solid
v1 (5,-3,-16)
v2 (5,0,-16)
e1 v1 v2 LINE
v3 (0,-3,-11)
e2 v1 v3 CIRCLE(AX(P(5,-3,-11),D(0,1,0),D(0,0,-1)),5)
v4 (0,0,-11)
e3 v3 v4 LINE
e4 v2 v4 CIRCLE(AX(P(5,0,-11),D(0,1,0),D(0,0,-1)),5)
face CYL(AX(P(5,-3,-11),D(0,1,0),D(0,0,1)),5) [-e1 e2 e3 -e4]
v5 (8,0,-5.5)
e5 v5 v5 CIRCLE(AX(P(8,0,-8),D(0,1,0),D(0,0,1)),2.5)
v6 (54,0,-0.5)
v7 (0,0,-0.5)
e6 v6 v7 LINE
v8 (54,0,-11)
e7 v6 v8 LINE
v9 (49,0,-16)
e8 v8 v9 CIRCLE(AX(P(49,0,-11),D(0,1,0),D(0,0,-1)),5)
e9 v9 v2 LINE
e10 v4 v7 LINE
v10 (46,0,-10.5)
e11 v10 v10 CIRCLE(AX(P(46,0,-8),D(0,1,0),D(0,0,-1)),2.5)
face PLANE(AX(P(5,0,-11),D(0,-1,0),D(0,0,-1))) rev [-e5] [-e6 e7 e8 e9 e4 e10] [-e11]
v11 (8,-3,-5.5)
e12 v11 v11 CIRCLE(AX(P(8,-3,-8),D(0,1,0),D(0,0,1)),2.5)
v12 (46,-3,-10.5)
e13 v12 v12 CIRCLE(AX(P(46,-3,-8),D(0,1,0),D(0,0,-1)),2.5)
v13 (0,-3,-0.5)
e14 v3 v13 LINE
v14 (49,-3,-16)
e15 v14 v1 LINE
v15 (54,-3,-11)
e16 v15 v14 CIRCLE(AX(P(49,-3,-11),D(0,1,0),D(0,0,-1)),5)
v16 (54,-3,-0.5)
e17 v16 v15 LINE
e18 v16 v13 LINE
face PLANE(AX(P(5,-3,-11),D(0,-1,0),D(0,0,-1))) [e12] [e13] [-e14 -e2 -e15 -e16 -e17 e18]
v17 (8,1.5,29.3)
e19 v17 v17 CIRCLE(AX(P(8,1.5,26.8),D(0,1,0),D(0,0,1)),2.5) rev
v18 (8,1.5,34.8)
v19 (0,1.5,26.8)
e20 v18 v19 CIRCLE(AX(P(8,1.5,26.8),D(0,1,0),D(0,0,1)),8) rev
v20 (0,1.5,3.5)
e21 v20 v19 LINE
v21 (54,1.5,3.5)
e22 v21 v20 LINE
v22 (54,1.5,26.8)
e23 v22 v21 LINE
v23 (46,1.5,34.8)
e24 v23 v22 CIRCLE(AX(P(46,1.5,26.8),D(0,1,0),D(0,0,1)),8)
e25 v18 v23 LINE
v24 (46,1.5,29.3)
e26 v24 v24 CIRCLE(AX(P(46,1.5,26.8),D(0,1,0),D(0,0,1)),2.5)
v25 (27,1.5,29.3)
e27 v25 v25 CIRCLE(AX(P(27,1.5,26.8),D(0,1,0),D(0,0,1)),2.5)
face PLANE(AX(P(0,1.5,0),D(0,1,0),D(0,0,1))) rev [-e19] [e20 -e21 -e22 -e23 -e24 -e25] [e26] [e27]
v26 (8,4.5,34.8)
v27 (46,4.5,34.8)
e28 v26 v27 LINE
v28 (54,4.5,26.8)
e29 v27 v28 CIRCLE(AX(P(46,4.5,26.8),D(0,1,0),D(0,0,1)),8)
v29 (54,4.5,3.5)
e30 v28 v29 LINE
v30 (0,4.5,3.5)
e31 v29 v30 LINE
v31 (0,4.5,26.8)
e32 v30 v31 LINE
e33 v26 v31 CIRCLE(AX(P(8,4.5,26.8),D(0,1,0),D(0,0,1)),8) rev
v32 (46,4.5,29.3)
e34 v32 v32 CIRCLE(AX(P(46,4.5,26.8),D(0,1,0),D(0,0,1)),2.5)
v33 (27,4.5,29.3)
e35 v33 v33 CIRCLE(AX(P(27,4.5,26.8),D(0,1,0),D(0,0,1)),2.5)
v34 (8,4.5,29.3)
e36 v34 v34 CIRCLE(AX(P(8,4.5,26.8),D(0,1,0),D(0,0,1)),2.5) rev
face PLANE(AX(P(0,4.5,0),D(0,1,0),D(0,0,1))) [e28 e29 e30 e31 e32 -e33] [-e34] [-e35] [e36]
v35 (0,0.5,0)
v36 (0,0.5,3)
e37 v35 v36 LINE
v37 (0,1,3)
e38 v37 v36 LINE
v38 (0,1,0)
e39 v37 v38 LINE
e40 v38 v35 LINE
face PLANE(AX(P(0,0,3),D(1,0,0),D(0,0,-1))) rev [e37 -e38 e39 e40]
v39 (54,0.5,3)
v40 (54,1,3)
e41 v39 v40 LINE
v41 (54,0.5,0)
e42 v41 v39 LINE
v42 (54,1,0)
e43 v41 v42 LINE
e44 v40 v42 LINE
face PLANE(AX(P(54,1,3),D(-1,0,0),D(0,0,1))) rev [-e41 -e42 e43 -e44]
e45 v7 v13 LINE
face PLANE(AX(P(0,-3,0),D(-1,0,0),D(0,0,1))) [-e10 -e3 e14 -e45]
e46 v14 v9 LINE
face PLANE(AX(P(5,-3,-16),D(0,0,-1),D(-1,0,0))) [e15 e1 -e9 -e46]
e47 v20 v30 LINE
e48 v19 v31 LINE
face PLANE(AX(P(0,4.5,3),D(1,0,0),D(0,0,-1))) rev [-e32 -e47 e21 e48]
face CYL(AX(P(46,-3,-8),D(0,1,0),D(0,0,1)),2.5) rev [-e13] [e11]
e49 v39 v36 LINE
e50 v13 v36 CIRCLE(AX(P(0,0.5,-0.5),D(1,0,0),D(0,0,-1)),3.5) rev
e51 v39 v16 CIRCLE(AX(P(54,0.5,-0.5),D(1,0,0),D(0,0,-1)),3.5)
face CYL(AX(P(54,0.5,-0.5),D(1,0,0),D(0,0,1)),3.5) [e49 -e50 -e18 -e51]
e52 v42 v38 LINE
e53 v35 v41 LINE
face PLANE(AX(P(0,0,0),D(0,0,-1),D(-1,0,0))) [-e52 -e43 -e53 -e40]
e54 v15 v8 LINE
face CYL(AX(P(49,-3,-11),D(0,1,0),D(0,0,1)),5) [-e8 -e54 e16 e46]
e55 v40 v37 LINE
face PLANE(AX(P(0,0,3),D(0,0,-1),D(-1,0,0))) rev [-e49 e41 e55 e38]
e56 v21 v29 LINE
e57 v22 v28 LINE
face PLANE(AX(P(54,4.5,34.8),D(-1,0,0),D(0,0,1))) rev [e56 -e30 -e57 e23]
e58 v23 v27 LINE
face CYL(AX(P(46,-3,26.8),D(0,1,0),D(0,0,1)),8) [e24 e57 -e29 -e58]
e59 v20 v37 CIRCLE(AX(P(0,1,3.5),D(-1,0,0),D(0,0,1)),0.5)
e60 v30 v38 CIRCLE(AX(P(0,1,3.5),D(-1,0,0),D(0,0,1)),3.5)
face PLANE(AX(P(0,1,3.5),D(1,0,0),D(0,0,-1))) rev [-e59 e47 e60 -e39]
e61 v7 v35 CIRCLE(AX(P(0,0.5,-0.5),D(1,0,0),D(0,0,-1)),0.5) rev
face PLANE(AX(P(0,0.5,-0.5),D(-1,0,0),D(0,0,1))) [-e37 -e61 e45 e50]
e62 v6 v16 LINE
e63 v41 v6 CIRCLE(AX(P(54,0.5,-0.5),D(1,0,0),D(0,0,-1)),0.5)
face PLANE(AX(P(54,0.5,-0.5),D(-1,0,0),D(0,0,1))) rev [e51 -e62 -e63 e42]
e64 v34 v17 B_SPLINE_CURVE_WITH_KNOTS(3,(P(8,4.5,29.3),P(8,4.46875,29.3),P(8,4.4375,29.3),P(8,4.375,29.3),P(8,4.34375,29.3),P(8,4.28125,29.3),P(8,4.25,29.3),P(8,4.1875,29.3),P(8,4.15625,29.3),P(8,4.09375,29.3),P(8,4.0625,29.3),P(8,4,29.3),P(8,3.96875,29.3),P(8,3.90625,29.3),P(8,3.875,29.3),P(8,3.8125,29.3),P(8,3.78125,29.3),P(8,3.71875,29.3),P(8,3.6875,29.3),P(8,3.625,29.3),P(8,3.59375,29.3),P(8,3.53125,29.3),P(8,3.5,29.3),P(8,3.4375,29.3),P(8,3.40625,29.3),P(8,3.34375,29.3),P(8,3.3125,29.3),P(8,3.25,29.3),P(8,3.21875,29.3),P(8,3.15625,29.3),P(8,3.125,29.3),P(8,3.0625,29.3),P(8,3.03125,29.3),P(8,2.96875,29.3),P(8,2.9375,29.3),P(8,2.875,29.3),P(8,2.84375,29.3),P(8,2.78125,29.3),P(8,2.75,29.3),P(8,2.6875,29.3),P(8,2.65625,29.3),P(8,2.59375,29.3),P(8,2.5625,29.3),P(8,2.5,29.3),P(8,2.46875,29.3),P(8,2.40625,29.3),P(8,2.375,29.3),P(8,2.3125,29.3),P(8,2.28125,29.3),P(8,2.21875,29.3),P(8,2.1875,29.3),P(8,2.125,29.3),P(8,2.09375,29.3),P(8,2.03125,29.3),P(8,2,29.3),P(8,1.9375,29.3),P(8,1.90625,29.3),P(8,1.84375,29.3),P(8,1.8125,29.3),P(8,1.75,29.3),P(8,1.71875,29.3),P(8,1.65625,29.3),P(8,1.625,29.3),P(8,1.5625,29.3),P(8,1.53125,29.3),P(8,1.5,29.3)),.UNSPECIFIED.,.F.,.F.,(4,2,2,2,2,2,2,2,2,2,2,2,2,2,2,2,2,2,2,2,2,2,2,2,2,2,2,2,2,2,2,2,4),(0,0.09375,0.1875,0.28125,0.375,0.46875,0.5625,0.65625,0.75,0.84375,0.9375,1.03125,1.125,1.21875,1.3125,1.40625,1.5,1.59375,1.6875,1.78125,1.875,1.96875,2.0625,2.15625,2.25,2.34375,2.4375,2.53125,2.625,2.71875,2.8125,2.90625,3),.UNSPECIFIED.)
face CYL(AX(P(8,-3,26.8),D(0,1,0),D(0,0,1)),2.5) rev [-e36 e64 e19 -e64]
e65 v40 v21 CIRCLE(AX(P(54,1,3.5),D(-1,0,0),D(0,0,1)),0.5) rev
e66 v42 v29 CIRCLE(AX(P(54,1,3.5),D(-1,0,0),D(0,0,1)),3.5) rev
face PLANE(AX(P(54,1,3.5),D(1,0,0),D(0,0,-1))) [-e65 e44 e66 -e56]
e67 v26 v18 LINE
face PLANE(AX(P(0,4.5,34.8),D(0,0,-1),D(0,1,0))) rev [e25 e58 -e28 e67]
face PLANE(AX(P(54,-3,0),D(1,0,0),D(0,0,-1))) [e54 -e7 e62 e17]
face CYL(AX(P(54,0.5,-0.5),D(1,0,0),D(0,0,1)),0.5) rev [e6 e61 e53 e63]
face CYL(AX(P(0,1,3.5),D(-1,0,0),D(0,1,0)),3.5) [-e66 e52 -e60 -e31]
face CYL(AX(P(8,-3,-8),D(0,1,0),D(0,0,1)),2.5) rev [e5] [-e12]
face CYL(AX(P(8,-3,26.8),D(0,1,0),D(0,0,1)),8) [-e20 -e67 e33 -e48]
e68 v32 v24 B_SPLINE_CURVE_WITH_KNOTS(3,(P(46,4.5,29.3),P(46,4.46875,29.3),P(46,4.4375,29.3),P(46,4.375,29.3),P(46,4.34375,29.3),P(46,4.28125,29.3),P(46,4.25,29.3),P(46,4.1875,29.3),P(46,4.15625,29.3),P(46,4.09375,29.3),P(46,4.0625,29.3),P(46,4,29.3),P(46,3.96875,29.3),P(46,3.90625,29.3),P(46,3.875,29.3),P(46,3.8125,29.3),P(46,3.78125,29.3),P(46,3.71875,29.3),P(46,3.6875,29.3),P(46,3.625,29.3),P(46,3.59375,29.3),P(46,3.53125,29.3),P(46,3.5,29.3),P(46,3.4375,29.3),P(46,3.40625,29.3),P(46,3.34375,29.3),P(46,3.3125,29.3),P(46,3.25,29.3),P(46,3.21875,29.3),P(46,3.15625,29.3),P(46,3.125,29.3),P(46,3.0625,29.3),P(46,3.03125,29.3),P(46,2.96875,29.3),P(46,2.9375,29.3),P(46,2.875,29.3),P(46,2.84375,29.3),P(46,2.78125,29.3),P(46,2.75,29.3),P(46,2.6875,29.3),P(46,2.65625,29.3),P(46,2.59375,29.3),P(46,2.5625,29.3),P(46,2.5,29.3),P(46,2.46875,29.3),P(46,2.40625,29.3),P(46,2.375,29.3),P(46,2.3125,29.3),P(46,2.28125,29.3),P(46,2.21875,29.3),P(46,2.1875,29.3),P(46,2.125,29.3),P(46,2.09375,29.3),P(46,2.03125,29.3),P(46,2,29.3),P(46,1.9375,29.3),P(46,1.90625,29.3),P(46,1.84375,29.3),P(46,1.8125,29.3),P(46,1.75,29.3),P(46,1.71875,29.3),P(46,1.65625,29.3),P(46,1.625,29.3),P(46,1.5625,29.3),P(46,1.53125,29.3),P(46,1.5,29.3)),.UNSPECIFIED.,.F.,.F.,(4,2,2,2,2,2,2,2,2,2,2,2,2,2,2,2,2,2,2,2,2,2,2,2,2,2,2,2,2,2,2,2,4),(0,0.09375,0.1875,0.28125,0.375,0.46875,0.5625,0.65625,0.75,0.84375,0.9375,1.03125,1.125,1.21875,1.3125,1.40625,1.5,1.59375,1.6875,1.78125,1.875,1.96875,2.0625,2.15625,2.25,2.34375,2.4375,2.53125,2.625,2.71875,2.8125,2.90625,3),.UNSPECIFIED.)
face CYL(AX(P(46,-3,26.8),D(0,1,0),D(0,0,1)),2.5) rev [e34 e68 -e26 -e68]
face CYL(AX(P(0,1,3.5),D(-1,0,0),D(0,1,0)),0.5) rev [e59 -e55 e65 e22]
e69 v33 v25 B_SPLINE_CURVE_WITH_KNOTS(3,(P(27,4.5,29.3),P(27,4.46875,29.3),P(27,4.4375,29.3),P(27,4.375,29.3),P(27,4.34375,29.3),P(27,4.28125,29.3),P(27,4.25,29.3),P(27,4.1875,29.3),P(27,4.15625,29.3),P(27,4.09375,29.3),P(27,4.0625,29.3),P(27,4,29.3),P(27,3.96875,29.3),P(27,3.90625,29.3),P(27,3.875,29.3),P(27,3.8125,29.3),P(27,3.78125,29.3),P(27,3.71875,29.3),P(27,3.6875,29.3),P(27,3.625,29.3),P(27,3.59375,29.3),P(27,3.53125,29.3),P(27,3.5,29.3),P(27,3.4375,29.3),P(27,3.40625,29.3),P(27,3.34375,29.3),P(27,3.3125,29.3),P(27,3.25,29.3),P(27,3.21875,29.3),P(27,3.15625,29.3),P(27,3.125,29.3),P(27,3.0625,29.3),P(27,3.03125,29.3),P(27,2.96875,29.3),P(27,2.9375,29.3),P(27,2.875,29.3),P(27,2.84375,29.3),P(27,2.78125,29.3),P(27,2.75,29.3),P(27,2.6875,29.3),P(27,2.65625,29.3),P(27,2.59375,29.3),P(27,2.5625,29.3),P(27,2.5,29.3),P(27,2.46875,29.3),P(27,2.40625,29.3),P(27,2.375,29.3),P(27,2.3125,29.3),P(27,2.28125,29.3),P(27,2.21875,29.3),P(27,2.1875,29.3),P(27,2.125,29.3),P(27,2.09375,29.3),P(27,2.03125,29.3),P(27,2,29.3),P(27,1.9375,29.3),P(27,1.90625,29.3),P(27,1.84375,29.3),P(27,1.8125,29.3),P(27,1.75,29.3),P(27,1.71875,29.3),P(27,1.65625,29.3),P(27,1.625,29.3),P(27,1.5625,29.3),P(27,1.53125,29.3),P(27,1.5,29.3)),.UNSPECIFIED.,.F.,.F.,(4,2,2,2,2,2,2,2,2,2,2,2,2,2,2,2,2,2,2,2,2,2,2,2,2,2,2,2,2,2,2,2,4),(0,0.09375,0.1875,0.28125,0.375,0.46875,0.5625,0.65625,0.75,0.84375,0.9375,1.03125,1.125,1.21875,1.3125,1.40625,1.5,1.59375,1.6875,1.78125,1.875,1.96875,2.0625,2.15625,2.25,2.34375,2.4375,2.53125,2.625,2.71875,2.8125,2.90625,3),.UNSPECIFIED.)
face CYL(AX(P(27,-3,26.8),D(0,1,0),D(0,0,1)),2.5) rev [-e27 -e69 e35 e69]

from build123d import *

# Parameters (mm, degrees)
SKETCH1_R                    = 2.5
BASE_FLANGE1_DEPTH           = 3
EDGE_FLANGE1_STRIP_W         = 13
EDGE_FLANGE1_STRIP_H         = 3
EDGE_FLANGE1_STRIP_CUT_DEPTH = 54
EDGE_FLANGE1_DEPTH           = 54
EDGE_FLANGE2_DEPTH           = 54
SKETCH25_R                   = 2.5
CUT_EXTRUDE1_DEPTH           = 65.67835805


# Sheet-metal steps are written as plain solids
with BuildPart() as part:
    # Sketch1 → Base-Flange1 (new body)
    with BuildSketch(Plane(origin=(0, 0, 0), x_dir=(1, 0, 0), z_dir=(0, 1, 0))):
        with BuildLine():
            Line((0, 0), (54, 0))
            Line((54, 0), (54, 11))
            ThreePointArc((54, 11), (52.535533906, 14.535533906), (49, 16))
            Line((49, 16), (5, 16))
            ThreePointArc((5, 16), (1.464466094, 14.535533906), (0, 11))
            Line((0, 11), (0, 0))
        make_face()
        with Locations(Location((8, 8, 0), (0, 0, 270))):
            Circle(SKETCH1_R, mode=Mode.SUBTRACT)
        with Locations(Location((46, 8, 0), (0, 0, 90))):
            Circle(SKETCH1_R, mode=Mode.SUBTRACT)
    extrude(amount=-BASE_FLANGE1_DEPTH)

    # Edge-Flange1 strip (across the edge) → Edge-Flange1 strip cut (cut)
    with BuildSketch(Plane(origin=(0, 0, 0), x_dir=(0, 0, -1), z_dir=(1, 0, 0))):
        with Locations((-6, -1.5)):
            Rectangle(EDGE_FLANGE1_STRIP_W, EDGE_FLANGE1_STRIP_H)
    extrude(amount=EDGE_FLANGE1_STRIP_CUT_DEPTH, mode=Mode.SUBTRACT)

    # Edge-Flange1 section (across the edge) → Edge-Flange1 (add)
    with BuildSketch(Plane(origin=(0, 0, 0), x_dir=(0, 0, -1), z_dir=(1, 0, 0))):
        with BuildLine():
            Line((-3, 0.5), (-3, 1))
            Line((-3, 1), (0, 1))
            Line((0, 1), (0, 0.5))
            ThreePointArc((0, 0.5), (0.146446609, 0.146446609), (0.5, 0))
            Line((0.5, 0), (0.5, -3))
            ThreePointArc((0.5, -3), (-1.974873734, -1.974873734), (-3, 0.5))
        make_face()
    extrude(amount=EDGE_FLANGE1_DEPTH)

    # Edge-Flange2 section (across the edge) → Edge-Flange2 (add)
    with BuildSketch(Plane(origin=(54, 1.5, 3), x_dir=(0, -1, 0), z_dir=(-1, 0, 0))):
        with BuildLine():
            Line((-3, 0.5), (-3, 31.8))
            Line((-3, 31.8), (0, 31.8))
            Line((0, 31.8), (0, 0.5))
            ThreePointArc((0, 0.5), (0.146446609, 0.146446609), (0.5, 0))
            Line((0.5, 0), (0.5, -3))
            ThreePointArc((0.5, -3), (-1.974873734, -1.974873734), (-3, 0.5))
        make_face()
    extrude(amount=EDGE_FLANGE2_DEPTH)

    # Sketch25 → Cut-Extrude1 (cut, through all)
    with BuildSketch(Plane(origin=(0, 4.5, 0), x_dir=(1, 0, 0), z_dir=(0, 1, 0))):
        with Locations(Location((27, -26.8, 0), (0, 0, 270))):
            Circle(SKETCH25_R)
        with Locations(Location((8, -26.8, 0), (0, 0, 270))):
            Circle(SKETCH25_R)
        with BuildLine():
            ThreePointArc((8, -34.8), (2.343145751, -32.456854249), (0, -26.8))
            Line((0, -26.8), (0, -34.8))
            Line((0, -34.8), (8, -34.8))
        make_face()
        with Locations(Location((46, -26.8, 0), (0, 0, 270))):
            Circle(SKETCH25_R)
        with BuildLine():
            Line((54, -34.8), (54, -26.8))
            ThreePointArc((54, -26.8), (51.656854249, -32.456854249), (46, -34.8))
            Line((46, -34.8), (54, -34.8))
        make_face()
    extrude(amount=-CUT_EXTRUDE1_DEPTH, mode=Mode.SUBTRACT)


solid = part.part
